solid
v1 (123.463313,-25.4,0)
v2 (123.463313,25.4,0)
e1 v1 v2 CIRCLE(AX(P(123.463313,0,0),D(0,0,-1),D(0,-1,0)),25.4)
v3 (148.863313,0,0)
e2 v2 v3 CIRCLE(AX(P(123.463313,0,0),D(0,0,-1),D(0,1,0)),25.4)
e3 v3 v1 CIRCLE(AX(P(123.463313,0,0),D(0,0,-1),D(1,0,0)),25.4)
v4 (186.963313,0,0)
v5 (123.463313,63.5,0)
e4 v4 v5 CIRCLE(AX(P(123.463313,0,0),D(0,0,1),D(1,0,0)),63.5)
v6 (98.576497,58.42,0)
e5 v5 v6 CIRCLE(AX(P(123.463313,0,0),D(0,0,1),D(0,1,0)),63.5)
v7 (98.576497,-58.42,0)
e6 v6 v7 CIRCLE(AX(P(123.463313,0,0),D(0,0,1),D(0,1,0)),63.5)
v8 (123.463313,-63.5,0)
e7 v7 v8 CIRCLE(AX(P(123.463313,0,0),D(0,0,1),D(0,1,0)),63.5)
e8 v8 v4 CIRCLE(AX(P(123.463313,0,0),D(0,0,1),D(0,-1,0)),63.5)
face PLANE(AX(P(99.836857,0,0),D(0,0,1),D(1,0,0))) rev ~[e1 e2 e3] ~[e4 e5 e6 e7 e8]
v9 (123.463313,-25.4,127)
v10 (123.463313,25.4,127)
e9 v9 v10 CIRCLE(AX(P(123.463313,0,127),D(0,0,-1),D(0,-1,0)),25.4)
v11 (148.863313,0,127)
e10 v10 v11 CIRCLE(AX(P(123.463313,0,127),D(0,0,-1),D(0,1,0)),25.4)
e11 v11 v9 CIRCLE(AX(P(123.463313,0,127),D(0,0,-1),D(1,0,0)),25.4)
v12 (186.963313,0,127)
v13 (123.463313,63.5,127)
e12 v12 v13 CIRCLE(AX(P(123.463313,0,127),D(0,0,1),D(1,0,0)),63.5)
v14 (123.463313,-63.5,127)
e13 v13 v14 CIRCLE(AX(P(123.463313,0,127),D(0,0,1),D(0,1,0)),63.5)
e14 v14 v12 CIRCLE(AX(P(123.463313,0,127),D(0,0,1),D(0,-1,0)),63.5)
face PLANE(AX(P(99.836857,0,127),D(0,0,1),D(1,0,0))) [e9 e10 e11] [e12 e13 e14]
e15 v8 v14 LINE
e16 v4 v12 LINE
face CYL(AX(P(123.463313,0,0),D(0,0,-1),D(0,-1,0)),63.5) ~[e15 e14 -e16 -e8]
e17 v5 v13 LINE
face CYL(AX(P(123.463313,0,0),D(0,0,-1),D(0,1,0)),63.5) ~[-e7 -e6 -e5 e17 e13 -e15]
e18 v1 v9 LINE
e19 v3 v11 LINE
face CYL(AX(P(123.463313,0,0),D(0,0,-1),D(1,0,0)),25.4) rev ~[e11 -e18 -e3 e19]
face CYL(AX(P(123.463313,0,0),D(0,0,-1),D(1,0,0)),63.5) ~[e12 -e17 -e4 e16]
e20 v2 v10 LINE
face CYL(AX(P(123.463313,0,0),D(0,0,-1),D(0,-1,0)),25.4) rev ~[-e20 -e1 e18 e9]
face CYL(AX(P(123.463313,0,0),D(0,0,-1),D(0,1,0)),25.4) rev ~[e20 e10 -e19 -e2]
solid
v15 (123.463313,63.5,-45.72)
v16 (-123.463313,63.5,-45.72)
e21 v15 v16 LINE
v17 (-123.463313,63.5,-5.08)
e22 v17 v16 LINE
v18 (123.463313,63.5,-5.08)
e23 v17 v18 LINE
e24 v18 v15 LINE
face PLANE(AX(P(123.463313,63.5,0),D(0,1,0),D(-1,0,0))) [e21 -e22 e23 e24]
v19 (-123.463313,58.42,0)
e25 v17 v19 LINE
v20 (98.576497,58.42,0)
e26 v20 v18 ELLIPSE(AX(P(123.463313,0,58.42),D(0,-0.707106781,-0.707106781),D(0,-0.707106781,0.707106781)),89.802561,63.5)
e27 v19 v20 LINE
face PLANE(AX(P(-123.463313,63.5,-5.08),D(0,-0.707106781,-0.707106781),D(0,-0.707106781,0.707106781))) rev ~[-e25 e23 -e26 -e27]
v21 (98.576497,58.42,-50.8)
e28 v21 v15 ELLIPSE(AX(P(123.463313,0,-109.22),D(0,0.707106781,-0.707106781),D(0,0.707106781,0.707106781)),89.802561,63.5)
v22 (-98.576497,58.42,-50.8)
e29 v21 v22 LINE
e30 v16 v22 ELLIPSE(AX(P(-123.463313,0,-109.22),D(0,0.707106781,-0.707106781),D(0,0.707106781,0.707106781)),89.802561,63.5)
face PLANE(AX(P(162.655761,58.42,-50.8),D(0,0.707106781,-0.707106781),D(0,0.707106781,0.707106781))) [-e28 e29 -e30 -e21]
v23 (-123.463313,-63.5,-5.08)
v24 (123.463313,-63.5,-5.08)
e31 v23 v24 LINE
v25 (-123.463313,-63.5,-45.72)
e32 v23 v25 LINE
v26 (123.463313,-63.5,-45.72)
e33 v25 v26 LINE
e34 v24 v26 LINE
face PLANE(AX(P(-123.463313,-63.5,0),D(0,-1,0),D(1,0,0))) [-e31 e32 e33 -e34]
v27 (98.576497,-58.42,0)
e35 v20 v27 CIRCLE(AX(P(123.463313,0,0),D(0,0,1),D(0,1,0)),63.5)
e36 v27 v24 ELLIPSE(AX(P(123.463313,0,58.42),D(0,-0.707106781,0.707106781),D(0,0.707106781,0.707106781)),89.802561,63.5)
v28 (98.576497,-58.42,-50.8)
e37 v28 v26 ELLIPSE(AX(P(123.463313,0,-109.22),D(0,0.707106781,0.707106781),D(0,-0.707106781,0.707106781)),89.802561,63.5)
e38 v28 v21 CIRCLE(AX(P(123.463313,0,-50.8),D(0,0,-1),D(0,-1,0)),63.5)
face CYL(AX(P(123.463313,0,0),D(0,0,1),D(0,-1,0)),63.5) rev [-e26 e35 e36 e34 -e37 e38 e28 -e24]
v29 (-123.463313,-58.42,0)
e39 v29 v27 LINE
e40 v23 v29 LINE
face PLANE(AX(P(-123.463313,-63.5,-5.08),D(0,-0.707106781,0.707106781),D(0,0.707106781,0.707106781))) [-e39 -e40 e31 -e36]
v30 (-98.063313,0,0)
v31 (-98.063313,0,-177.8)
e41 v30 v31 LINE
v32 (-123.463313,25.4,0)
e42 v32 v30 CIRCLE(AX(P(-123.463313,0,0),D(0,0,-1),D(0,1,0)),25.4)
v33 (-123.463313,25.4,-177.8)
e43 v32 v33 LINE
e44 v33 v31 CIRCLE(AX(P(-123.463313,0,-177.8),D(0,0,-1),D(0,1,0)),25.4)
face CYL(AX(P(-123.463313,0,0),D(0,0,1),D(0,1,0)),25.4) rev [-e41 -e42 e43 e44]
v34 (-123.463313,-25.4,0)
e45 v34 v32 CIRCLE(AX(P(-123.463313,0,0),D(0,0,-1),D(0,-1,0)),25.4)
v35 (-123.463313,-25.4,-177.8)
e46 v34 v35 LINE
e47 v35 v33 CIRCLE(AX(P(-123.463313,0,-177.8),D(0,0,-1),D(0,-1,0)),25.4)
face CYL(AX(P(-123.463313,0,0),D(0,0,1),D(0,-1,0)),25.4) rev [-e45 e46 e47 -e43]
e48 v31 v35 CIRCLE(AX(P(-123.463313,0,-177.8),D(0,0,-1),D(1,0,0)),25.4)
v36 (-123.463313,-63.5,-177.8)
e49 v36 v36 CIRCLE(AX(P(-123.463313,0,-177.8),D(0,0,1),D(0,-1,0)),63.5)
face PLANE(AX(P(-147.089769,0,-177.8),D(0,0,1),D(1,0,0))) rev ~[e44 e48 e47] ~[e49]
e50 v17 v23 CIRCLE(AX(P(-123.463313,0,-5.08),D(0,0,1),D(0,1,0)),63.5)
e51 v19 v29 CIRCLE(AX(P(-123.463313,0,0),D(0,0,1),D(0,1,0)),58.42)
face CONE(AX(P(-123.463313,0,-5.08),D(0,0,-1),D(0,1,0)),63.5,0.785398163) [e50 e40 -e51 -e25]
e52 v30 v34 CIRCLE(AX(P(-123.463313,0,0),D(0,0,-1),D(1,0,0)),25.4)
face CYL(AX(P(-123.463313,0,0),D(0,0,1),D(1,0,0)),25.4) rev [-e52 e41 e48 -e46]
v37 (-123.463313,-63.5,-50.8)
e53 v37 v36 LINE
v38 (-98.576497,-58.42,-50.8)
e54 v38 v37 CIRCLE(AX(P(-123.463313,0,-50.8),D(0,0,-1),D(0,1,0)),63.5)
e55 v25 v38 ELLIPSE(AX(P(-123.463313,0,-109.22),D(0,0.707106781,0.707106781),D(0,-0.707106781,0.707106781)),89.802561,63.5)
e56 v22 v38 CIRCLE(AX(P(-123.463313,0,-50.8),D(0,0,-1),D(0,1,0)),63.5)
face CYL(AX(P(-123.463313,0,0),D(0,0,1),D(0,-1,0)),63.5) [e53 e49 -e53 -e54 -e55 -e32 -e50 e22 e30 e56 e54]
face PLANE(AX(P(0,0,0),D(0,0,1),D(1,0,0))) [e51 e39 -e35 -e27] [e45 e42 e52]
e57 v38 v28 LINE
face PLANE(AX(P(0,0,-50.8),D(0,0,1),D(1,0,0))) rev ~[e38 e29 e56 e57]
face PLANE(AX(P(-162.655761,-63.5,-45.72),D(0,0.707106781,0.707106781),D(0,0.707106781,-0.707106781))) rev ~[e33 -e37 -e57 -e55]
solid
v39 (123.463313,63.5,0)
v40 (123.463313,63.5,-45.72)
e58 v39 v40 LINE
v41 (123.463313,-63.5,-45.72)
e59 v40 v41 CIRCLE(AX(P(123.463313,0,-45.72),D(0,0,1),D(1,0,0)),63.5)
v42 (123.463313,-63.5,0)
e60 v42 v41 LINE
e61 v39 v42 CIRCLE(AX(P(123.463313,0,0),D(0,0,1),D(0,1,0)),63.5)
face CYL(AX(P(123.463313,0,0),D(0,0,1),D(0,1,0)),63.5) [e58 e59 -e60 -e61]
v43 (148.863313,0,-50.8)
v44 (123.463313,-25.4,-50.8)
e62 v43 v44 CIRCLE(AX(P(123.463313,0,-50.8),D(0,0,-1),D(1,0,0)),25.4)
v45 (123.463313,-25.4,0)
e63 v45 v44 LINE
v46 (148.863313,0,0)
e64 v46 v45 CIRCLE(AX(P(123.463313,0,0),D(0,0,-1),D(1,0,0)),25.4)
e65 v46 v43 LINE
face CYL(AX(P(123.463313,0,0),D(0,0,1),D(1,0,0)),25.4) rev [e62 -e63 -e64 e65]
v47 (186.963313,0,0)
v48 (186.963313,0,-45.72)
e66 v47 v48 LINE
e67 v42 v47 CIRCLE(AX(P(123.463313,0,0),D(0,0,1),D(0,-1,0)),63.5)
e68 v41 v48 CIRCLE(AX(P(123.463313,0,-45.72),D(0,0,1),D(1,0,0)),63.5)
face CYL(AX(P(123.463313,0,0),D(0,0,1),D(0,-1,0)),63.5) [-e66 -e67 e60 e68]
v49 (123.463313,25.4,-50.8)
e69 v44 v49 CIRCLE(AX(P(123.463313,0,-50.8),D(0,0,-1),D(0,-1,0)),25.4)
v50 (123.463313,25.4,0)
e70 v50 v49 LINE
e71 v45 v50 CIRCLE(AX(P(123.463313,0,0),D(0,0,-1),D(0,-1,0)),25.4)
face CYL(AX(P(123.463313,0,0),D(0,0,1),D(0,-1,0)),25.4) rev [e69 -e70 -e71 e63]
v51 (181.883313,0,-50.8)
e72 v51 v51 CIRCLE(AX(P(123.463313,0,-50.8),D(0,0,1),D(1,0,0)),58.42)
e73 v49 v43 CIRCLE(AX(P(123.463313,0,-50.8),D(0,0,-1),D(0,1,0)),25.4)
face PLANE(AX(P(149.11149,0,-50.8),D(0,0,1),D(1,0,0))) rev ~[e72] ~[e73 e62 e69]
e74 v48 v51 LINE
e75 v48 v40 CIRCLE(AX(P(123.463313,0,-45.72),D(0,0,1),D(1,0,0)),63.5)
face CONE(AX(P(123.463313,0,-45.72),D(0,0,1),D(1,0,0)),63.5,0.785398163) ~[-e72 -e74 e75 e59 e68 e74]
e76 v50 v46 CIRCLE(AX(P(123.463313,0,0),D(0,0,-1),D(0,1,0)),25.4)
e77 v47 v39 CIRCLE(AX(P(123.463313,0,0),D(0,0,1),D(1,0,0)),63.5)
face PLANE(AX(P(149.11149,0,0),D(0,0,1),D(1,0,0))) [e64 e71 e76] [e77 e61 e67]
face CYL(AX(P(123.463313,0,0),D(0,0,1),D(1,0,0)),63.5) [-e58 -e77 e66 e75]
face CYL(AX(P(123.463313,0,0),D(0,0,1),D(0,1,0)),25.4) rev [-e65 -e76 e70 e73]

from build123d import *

# Parameters (mm, degrees)
F1_DEPTH     = 127
F2_DEPTH     = 177.8
F3_DEPTH     = 50.8
F4_DEPTH     = 50.8
F5_T1_DEPTH  = 286.1190739645
F5_T4_ANGLE  = 180
F5_T8_DEPTH  = 325.3115227011
F5_S9_R      = 63.5
F5_T10_DEPTH = 164
F5_T14_DEPTH = 325.3115227011
F5_S15_R     = 63.5
F5_T16_DEPTH = 164


# Not quite as in the source:
# - a fillet or chamfer that OpenCascade refuses, or shapes differently, is made with other operations: its cross-section is extruded or revolved along the edge and cut away or added


with BuildPart() as f1:
    # F0 (on Top) → F1 (new body)
    with BuildSketch(Plane.XY):
        with BuildLine():
            ThreePointArc((123.463312614, 63.5), (59.963312614, 0), (123.463312614, -63.5))
            Line((123.463312614, -63.5), (123.463312614, -25.4))
            ThreePointArc((123.463312614, -25.4), (98.063312614, 0), (123.463312614, 25.4))
            Line((123.463312614, 25.4), (123.463312614, 63.5))
        make_face()
        with BuildLine():
            Line((123.463312614, -25.4), (123.463312614, -63.5))
            ThreePointArc((123.463312614, -63.5), (168.3645932193, -44.9012806053), (186.963312614, 0))
            ThreePointArc((186.963312614, 0), (168.3645932193, 44.9012806053), (123.463312614, 63.5))
            Line((123.463312614, 63.5), (123.463312614, 25.4))
            ThreePointArc((123.463312614, 25.4), (141.4238248561, 17.9605122421), (148.863312614, 0))
            ThreePointArc((148.863312614, 0), (141.4238248561, -17.9605122421), (123.463312614, -25.4))
        make_face()
    extrude(amount=F1_DEPTH)



with BuildPart() as f2:
    # F0 (on Top) → F2 (new body)
    with BuildSketch(Plane.XY):
        with BuildLine():
            ThreePointArc((-123.463312614, 63.5), (-186.963312614, 0), (-123.463312614, -63.5))
            Line((-123.463312614, -63.5), (-123.463312614, -25.4))
            ThreePointArc((-123.463312614, -25.4), (-148.863312614, 0), (-123.463312614, 25.4))
            Line((-123.463312614, 25.4), (-123.463312614, 63.5))
        make_face()
        with BuildLine():
            Line((-123.463312614, -25.4), (-123.463312614, -63.5))
            ThreePointArc((-123.463312614, -63.5), (-78.5620320086, -44.9012806053), (-59.963312614, 0))
            ThreePointArc((-59.963312614, 0), (-78.5620320086, 44.9012806053), (-123.463312614, 63.5))
            Line((-123.463312614, 63.5), (-123.463312614, 25.4))
            ThreePointArc((-123.463312614, 25.4), (-105.5028003718, 17.9605122421), (-98.063312614, 0))
            ThreePointArc((-98.063312614, 0), (-105.5028003718, -17.9605122421), (-123.463312614, -25.4))
        make_face()
    extrude(amount=-F2_DEPTH)


with BuildPart() as f1_1:
    add(f1.part)

    add(f2.part)  # F3 merges F2
    # F0 (on Top) → F3 (join)
    with BuildSketch(Plane.XY):
        with BuildLine():
            Line((-123.463312614, -63.5), (123.463312614, -63.5))
            ThreePointArc((123.463312614, -63.5), (59.963312614, 0), (123.463312614, 63.5))
            Line((123.463312614, 63.5), (-123.463312614, 63.5))
            ThreePointArc((-123.463312614, 63.5), (-78.5620320086, 44.9012806053), (-59.963312614, 0))
            ThreePointArc((-59.963312614, 0), (-78.5620320086, -44.9012806053), (-123.463312614, -63.5))
        make_face()
    extrude(amount=-F3_DEPTH)

    # F5: chamfer of 5.08 on 3 edges, made by hand

    # F5_s2 → F5_t1 (cut)
    with BuildSketch(Plane.YZ.offset(-123.463312614)):
        Polygon((63.5, -5.08), (58.42, 0), (63.5, 0), align=None)
        Polygon((-63.5, -5.08), (-58.42, 0), (-63.5, 0), align=None)
    extrude(amount=F5_T1_DEPTH, mode=Mode.SUBTRACT)

    # F5_s3 → F5_t4 (revolve, cut)
    with BuildSketch(Plane.YZ.offset(-123.463312614)):
        Polygon((63.5, -5.08), (58.42, 0), (63.5, 0), align=None)
    revolve(axis=Axis((-123.463312614, 0, 0), (0, 0, 1)), revolution_arc=F5_T4_ANGLE, mode=Mode.SUBTRACT)


with BuildPart() as f4:
    # F0 (on Top) → F4 (new body)
    with BuildSketch(Plane.XY):
        with BuildLine():
            Line((123.463312614, -25.4), (123.463312614, -63.5))
            ThreePointArc((123.463312614, -63.5), (168.3645932193, -44.9012806053), (186.963312614, 0))
            ThreePointArc((186.963312614, 0), (168.3645932193, 44.9012806053), (123.463312614, 63.5))
            Line((123.463312614, 63.5), (123.463312614, 25.4))
            ThreePointArc((123.463312614, 25.4), (141.4238248561, 17.9605122421), (148.863312614, 0))
            ThreePointArc((148.863312614, 0), (141.4238248561, -17.9605122421), (123.463312614, -25.4))
        make_face()
        with BuildLine():
            ThreePointArc((123.463312614, 63.5), (59.963312614, 0), (123.463312614, -63.5))
            Line((123.463312614, -63.5), (123.463312614, -25.4))
            ThreePointArc((123.463312614, -25.4), (98.063312614, 0), (123.463312614, 25.4))
            Line((123.463312614, 25.4), (123.463312614, 63.5))
        make_face()
    extrude(amount=-F4_DEPTH)

    # F5#2: chamfer of 5.08 on 1 edges, made by hand

    # F5_2_s1 → F5_2_t2 (revolve, cut)
    with BuildSketch(Plane.XZ):
        Polygon((186.963312614, -45.72), (181.883312614, -50.8), (186.963312614, -50.8), align=None)
    revolve(axis=Axis((123.463312614, 0, -50.8), (0, 0, 1)), mode=Mode.SUBTRACT)


with BuildPart() as f5_tool6:
    # F5_s7 → F5_t8 (new body)
    with BuildSketch(Plane.YZ.offset(-162.6557613506)):
        Polygon((-63.5, -45.72), (-58.42, -50.8), (-63.5, -50.8), align=None)
    extrude(amount=F5_T8_DEPTH)

    # F5_s9 → F5_t10 (cut, symmetric)
    with BuildSketch(Plane.XY.offset(-48.3)):
        with Locations((-123.463312614, 0)):
            Circle(F5_S9_R)
    extrude(amount=F5_T10_DEPTH, both=True, mode=Mode.SUBTRACT)


with BuildPart() as f1_2:
    add(f1_1.part)

    # F5_t5: cut F5_tool6
    add(f5_tool6.part, mode=Mode.SUBTRACT)


with BuildPart() as f5_tool12:
    # F5_s13 → F5_t14 (new body)
    with BuildSketch(Plane.YZ.offset(162.6557613506)):
        Polygon((58.42, -50.8), (63.5, -45.72), (63.5, -50.8), align=None)
    extrude(amount=-F5_T14_DEPTH)

    # F5_s15 → F5_t16 (cut, symmetric)
    with BuildSketch(Plane.XY.offset(-48.3)):
        with Locations((-123.463312614, 0)):
            Circle(F5_S15_R)
    extrude(amount=F5_T16_DEPTH, both=True, mode=Mode.SUBTRACT)


with BuildPart() as f1_3:
    add(f1_2.part)

    # F5_t11: cut F5_tool12
    add(f5_tool12.part, mode=Mode.SUBTRACT)


solid = Compound([f4.part, f1_3.part])
